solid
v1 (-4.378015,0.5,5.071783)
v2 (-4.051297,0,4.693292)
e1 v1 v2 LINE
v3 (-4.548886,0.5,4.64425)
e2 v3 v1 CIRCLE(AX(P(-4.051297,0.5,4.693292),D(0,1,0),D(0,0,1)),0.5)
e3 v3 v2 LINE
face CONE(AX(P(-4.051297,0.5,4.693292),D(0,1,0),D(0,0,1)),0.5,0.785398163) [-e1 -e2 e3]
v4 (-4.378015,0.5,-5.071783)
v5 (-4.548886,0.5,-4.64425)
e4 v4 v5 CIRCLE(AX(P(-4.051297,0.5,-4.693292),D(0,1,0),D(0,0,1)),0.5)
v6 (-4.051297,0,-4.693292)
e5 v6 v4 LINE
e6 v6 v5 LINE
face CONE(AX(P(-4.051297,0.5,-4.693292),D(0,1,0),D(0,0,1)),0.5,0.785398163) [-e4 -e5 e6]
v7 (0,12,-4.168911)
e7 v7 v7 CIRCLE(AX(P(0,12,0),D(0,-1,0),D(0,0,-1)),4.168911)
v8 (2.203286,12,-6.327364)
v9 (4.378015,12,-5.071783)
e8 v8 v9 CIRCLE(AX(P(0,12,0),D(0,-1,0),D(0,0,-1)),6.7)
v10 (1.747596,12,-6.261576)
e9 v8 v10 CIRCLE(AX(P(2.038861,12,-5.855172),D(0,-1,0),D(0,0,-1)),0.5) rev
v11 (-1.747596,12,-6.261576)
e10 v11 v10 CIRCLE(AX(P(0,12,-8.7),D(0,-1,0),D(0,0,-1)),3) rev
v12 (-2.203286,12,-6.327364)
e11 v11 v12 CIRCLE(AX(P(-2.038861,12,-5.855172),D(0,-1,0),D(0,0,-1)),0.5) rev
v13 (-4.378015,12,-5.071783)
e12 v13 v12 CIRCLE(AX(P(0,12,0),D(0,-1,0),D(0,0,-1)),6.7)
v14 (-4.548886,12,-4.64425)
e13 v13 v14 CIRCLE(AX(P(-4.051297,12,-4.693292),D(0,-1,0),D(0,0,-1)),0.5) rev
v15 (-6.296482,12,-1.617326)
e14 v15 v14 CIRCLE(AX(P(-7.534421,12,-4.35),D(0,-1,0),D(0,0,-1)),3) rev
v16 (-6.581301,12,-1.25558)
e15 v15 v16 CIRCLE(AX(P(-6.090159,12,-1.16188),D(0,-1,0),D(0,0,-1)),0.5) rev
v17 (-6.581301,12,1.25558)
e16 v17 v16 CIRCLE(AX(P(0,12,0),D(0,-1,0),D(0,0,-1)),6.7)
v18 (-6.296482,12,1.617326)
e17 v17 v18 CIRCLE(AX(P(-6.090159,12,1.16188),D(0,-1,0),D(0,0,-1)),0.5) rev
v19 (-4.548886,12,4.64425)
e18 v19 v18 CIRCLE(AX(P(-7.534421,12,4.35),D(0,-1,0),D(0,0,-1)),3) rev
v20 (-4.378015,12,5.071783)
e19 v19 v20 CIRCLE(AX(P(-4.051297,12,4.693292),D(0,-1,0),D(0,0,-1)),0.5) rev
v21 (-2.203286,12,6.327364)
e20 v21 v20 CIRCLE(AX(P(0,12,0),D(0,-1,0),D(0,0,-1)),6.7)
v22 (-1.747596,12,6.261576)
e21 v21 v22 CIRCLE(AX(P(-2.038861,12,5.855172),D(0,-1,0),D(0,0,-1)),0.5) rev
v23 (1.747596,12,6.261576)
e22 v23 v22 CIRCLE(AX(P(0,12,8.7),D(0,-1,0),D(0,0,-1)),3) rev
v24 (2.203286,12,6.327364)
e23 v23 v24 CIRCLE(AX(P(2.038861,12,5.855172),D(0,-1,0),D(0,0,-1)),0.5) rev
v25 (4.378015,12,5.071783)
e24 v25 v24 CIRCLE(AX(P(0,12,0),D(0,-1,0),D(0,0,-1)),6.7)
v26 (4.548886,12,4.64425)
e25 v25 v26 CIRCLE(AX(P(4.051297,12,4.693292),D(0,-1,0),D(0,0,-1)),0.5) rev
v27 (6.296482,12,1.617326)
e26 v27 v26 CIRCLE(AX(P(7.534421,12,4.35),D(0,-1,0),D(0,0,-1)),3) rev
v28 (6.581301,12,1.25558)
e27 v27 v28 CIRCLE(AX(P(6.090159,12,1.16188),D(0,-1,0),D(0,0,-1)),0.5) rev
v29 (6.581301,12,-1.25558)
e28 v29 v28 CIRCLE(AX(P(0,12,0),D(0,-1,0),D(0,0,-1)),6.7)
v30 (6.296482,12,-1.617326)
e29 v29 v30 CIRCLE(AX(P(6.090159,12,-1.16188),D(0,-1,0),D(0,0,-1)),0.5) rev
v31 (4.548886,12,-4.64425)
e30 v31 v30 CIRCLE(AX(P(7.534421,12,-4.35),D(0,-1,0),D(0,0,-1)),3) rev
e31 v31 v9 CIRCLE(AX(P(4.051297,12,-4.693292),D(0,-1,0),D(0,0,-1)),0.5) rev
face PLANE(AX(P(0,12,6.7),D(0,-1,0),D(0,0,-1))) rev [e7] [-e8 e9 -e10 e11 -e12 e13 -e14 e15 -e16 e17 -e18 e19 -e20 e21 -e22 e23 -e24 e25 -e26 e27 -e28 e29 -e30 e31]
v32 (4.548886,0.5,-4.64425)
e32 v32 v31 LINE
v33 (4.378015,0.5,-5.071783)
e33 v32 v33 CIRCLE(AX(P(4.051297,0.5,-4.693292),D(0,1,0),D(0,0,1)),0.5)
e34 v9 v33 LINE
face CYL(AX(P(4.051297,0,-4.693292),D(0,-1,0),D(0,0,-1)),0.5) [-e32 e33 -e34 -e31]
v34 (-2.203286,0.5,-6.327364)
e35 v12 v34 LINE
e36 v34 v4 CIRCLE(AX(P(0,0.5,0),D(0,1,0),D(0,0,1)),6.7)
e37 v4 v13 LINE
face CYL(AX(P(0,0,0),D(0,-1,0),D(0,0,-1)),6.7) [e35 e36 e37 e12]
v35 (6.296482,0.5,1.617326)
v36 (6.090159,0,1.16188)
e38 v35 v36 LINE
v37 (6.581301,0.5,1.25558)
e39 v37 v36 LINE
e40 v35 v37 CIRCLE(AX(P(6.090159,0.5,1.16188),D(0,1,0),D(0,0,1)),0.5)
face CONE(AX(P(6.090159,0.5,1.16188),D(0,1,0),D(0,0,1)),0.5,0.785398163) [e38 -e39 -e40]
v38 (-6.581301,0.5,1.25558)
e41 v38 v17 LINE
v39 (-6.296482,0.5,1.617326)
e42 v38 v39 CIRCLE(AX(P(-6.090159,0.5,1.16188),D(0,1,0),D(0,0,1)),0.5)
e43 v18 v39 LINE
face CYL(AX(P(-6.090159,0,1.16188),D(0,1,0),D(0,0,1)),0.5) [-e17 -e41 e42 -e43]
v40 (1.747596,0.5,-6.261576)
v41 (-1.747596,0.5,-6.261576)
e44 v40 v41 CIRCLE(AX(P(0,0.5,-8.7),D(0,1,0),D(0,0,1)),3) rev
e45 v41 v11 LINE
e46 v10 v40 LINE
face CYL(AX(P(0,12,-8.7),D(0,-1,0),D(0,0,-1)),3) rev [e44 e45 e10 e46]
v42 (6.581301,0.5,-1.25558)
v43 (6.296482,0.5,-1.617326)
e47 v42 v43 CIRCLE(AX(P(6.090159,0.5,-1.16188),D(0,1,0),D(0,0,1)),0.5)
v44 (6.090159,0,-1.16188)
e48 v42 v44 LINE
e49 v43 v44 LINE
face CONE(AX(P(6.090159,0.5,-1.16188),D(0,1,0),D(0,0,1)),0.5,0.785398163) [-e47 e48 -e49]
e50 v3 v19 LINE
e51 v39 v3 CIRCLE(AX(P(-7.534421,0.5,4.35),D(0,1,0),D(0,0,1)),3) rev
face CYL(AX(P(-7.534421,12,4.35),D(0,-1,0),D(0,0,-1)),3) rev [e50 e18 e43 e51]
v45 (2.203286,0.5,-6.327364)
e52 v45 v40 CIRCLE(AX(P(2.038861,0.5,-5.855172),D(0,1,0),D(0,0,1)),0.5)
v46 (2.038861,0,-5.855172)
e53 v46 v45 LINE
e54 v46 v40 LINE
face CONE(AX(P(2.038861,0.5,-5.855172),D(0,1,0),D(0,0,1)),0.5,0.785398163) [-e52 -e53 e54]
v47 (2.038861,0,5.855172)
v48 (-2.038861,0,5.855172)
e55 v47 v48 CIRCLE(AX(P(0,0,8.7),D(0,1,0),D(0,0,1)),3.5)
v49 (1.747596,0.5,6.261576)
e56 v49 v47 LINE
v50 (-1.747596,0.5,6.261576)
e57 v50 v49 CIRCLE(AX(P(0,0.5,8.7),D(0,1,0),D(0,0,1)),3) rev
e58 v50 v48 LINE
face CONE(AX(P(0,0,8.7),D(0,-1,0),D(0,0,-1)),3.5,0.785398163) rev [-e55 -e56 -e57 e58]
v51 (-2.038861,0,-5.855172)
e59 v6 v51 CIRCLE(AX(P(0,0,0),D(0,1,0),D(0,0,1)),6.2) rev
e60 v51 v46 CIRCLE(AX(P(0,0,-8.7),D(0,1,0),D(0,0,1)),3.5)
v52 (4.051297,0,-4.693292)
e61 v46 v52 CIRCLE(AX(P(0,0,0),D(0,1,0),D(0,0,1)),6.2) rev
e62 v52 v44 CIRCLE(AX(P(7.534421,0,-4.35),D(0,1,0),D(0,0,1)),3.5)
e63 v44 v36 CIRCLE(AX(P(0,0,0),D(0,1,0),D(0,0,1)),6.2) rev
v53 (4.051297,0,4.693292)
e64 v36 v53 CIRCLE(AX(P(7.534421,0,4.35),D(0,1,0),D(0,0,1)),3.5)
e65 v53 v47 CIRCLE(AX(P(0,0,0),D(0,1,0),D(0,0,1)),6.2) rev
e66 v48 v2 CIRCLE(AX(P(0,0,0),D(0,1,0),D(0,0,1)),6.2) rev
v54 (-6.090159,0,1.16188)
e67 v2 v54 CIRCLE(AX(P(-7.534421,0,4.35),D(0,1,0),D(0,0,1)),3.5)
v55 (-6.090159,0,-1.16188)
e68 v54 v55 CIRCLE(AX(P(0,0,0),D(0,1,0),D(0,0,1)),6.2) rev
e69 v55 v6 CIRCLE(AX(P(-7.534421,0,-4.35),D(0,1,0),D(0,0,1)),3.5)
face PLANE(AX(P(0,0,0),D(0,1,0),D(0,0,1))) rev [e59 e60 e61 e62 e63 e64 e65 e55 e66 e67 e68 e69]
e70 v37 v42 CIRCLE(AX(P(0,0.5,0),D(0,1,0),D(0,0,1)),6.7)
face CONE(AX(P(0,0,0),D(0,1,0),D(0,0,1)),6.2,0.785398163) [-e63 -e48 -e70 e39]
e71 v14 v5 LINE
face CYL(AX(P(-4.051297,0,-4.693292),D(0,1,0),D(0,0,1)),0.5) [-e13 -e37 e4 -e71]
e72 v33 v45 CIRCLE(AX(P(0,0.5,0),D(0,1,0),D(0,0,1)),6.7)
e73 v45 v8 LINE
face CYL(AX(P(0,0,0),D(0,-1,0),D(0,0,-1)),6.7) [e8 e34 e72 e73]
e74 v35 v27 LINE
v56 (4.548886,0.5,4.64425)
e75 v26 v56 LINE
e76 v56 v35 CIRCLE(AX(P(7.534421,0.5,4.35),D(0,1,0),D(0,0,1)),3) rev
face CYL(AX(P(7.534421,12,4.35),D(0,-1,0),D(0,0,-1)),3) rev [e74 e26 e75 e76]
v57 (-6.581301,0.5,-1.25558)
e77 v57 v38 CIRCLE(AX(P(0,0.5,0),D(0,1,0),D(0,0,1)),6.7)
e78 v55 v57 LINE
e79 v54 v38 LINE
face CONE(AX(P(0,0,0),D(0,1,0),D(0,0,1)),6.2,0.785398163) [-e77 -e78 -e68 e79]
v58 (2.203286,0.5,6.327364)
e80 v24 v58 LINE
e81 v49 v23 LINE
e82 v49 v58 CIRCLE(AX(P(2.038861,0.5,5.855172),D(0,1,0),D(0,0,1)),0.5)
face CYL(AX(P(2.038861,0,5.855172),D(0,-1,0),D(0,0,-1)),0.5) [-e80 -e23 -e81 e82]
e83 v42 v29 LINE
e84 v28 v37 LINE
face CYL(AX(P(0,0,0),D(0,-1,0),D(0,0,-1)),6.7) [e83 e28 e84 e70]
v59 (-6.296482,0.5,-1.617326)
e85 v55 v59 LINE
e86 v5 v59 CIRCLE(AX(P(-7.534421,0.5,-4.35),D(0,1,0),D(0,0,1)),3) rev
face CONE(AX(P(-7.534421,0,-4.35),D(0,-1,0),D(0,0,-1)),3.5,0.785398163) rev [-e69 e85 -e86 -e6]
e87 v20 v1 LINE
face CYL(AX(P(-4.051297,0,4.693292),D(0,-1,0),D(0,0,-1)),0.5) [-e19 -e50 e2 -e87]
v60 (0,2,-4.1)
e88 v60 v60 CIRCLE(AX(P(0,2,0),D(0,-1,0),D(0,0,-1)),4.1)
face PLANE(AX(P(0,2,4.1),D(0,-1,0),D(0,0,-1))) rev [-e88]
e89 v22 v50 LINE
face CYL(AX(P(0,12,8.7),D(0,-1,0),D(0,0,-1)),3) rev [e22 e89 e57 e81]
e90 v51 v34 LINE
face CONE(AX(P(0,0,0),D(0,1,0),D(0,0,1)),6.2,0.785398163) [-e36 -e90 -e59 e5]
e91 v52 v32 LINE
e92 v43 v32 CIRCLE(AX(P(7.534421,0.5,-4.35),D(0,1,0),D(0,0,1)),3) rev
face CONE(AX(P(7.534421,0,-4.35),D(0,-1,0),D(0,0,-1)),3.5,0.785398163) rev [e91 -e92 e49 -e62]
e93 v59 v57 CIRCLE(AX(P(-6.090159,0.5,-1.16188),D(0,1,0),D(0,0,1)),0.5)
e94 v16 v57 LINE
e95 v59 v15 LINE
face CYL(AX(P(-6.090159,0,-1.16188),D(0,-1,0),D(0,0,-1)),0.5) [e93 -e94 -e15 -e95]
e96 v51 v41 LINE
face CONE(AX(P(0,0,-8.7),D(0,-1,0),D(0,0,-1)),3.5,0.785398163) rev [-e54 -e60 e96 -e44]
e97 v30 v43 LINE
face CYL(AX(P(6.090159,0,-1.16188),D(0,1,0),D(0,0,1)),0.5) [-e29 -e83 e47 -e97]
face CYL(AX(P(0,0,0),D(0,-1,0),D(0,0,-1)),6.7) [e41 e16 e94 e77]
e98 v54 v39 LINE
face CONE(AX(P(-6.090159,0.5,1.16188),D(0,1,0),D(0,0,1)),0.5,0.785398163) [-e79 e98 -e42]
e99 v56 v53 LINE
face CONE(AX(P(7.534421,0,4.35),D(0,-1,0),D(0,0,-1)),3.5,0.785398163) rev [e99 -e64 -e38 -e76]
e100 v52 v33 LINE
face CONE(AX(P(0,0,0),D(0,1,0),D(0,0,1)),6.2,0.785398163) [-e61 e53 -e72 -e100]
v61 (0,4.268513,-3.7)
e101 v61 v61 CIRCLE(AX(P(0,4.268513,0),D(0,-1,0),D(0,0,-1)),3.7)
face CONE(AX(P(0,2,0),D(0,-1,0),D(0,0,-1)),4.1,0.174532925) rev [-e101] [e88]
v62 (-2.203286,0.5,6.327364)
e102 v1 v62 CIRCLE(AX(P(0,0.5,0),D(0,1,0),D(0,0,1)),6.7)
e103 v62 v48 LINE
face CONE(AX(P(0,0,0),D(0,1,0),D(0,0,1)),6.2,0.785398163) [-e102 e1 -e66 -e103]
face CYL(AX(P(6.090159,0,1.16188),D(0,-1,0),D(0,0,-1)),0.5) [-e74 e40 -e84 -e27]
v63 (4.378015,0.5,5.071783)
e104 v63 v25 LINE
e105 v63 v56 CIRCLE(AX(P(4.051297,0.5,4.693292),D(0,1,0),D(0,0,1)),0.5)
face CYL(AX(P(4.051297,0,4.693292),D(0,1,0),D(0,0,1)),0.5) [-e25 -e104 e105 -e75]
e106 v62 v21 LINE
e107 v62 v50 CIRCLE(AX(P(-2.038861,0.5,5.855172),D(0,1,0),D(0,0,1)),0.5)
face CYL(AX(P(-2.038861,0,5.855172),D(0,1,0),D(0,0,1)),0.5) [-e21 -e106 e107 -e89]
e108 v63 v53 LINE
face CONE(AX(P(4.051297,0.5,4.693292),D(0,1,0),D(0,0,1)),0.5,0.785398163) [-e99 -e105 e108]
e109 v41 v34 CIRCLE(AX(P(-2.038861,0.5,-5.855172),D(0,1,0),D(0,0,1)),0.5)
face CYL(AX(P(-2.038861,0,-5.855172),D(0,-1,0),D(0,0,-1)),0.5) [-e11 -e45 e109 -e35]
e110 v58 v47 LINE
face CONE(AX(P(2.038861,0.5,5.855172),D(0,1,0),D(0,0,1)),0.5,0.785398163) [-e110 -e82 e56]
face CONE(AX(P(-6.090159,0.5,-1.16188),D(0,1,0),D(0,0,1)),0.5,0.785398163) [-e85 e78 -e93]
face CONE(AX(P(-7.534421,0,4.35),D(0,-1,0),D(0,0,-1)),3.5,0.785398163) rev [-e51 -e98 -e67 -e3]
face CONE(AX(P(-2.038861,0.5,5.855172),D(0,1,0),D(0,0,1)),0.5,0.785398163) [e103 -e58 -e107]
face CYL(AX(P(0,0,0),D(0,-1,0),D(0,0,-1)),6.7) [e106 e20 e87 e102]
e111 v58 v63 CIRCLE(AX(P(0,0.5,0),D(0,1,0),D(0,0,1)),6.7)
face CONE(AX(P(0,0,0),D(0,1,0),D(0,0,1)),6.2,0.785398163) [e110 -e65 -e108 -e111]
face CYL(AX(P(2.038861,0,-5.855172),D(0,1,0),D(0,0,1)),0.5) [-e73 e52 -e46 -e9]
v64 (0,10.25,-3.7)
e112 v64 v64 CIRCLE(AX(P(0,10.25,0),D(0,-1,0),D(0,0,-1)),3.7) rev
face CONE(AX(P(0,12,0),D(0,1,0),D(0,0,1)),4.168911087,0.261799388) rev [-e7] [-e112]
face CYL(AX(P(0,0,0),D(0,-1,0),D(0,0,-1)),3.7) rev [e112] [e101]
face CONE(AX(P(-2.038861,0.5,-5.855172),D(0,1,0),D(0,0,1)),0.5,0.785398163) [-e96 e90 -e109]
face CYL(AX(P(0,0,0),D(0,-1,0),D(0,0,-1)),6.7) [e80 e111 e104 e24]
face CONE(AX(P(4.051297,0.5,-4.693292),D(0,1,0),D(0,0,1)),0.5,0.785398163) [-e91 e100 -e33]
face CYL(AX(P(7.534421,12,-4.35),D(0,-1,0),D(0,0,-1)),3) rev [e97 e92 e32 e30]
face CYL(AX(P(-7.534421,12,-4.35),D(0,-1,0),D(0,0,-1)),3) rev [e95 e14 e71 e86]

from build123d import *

# Parameters (mm, degrees)
CHAMFER1_SIZE      = 1.75
CHAMFER1_SIZE2     = 0.468911087
SKETCH2_R          = 3
CUT_EXTRUDE1_DEPTH = 16.289865925
CIRPATTERN1_COUNT  = 6
FILLET1_R          = 0.5
CHAMFER2_SIZE      = 0.5


with BuildPart() as part:
    # Sketch1 → Revolve1 (revolve)
    with BuildSketch(Plane(origin=(0, 0, 0), x_dir=(0, 0, -1), z_dir=(1, 0, 0)), mode=Mode.PRIVATE) as revolve1_sk:
        Polygon((0, 0), (-6.7, 0), (-6.7, 12), (-3.7, 12), (-3.7, 4.268512728), (-4.1, 2), (0, 2), align=None)
    revolve(revolve1_sk.sketch.rotate(Axis((0, 0, 0), (0, 1, 0)), 180), axis=Axis((0, 0, 0), (0, 1, 0)))

    # Chamfer1
    chamfer1_edges = [part.edges().sort_by_distance(p)[0] for p in [
        (0, 12, 3.7),
    ]]
    chamfer1_side = [part.faces().sort_by_distance(p)[0] for p in [
        (0, 8.134256364, 3.7),
    ]]
    chamfer(chamfer1_edges, length=CHAMFER1_SIZE, length2=CHAMFER1_SIZE2, reference=chamfer1_side[0])

    # Sketch2 → Cut-Extrude1 (cut, through all)
    with BuildSketch(Plane(origin=(0, 0, 0), x_dir=(1, 0, 0), z_dir=(0, 1, 0))):
        with Locations((0, 8.7)):
            Circle(SKETCH2_R)
    cut_extrude1 = extrude(amount=CUT_EXTRUDE1_DEPTH, mode=Mode.SUBTRACT)

    # CirPattern1: Cut-Extrude1 ×6 about axis
    cirpattern1_axis = Axis((0, 0, 0), (0, 1, 0))
    for i in range(1, CIRPATTERN1_COUNT):
        add(cut_extrude1.rotate(cirpattern1_axis, i * 360 / CIRPATTERN1_COUNT), mode=Mode.SUBTRACT)

    # Fillet1
    fillet1_edges = [part.edges().sort_by_distance(p)[0] for p in [
        (1.941133962, 6, -6.412643678),
        (-1.941133962, 6, -6.412643678),
        (6.524079312, 6, -1.525250516),
        (4.58294535, 6, -4.887393162),
        (4.58294535, 6, 4.887393162),
        (6.524079312, 6, 1.525250516),
        (-1.941133962, 6, 6.412643678),
        (1.941133962, 6, 6.412643678),
        (-6.524079312, 6, 1.525250516),
        (-4.58294535, 6, 4.887393162),
        (-4.58294535, 6, -4.887393162),
        (-6.524079312, 6, -1.525250516),
    ]]
    fillet(fillet1_edges, radius=FILLET1_R)

    # Chamfer2
    chamfer2_edges = [part.edges().sort_by_distance(p)[0] for p in [
        (4.936344802, 0, -2.85),
        (6.7, 0, 0),
        (4.936344802, 0, 2.85),
        (3.35, 0, 5.802370205),
        (0, 0, 5.7),
        (-3.35, 0, 5.802370205),
        (-4.936344802, 0, 2.85),
        (-6.7, 0, 0),
        (-4.936344802, 0, -2.85),
        (-3.35, 0, -5.802370205),
        (0, 0, -5.7),
        (3.35, 0, -5.802370205),
        (-4.515588694, 0, -4.878854752),
        (4.515588694, 0, -4.878854752),
        (1.96741781, 0, -6.350041898),
        (-1.96741781, 0, -6.350041898),
        (-6.483006504, 0, -1.471187146),
        (-6.483006504, 0, 1.471187146),
        (-4.515588694, 0, 4.878854752),
        (-1.96741781, 0, 6.350041898),
        (1.96741781, 0, 6.350041898),
        (4.515588694, 0, 4.878854752),
        (6.483006504, 0, 1.471187146),
        (6.483006504, 0, -1.471187146),
    ]]
    chamfer(chamfer2_edges, length=CHAMFER2_SIZE - 0.0001)  # a hair under: the kernel refuses the full size


solid = part.part
